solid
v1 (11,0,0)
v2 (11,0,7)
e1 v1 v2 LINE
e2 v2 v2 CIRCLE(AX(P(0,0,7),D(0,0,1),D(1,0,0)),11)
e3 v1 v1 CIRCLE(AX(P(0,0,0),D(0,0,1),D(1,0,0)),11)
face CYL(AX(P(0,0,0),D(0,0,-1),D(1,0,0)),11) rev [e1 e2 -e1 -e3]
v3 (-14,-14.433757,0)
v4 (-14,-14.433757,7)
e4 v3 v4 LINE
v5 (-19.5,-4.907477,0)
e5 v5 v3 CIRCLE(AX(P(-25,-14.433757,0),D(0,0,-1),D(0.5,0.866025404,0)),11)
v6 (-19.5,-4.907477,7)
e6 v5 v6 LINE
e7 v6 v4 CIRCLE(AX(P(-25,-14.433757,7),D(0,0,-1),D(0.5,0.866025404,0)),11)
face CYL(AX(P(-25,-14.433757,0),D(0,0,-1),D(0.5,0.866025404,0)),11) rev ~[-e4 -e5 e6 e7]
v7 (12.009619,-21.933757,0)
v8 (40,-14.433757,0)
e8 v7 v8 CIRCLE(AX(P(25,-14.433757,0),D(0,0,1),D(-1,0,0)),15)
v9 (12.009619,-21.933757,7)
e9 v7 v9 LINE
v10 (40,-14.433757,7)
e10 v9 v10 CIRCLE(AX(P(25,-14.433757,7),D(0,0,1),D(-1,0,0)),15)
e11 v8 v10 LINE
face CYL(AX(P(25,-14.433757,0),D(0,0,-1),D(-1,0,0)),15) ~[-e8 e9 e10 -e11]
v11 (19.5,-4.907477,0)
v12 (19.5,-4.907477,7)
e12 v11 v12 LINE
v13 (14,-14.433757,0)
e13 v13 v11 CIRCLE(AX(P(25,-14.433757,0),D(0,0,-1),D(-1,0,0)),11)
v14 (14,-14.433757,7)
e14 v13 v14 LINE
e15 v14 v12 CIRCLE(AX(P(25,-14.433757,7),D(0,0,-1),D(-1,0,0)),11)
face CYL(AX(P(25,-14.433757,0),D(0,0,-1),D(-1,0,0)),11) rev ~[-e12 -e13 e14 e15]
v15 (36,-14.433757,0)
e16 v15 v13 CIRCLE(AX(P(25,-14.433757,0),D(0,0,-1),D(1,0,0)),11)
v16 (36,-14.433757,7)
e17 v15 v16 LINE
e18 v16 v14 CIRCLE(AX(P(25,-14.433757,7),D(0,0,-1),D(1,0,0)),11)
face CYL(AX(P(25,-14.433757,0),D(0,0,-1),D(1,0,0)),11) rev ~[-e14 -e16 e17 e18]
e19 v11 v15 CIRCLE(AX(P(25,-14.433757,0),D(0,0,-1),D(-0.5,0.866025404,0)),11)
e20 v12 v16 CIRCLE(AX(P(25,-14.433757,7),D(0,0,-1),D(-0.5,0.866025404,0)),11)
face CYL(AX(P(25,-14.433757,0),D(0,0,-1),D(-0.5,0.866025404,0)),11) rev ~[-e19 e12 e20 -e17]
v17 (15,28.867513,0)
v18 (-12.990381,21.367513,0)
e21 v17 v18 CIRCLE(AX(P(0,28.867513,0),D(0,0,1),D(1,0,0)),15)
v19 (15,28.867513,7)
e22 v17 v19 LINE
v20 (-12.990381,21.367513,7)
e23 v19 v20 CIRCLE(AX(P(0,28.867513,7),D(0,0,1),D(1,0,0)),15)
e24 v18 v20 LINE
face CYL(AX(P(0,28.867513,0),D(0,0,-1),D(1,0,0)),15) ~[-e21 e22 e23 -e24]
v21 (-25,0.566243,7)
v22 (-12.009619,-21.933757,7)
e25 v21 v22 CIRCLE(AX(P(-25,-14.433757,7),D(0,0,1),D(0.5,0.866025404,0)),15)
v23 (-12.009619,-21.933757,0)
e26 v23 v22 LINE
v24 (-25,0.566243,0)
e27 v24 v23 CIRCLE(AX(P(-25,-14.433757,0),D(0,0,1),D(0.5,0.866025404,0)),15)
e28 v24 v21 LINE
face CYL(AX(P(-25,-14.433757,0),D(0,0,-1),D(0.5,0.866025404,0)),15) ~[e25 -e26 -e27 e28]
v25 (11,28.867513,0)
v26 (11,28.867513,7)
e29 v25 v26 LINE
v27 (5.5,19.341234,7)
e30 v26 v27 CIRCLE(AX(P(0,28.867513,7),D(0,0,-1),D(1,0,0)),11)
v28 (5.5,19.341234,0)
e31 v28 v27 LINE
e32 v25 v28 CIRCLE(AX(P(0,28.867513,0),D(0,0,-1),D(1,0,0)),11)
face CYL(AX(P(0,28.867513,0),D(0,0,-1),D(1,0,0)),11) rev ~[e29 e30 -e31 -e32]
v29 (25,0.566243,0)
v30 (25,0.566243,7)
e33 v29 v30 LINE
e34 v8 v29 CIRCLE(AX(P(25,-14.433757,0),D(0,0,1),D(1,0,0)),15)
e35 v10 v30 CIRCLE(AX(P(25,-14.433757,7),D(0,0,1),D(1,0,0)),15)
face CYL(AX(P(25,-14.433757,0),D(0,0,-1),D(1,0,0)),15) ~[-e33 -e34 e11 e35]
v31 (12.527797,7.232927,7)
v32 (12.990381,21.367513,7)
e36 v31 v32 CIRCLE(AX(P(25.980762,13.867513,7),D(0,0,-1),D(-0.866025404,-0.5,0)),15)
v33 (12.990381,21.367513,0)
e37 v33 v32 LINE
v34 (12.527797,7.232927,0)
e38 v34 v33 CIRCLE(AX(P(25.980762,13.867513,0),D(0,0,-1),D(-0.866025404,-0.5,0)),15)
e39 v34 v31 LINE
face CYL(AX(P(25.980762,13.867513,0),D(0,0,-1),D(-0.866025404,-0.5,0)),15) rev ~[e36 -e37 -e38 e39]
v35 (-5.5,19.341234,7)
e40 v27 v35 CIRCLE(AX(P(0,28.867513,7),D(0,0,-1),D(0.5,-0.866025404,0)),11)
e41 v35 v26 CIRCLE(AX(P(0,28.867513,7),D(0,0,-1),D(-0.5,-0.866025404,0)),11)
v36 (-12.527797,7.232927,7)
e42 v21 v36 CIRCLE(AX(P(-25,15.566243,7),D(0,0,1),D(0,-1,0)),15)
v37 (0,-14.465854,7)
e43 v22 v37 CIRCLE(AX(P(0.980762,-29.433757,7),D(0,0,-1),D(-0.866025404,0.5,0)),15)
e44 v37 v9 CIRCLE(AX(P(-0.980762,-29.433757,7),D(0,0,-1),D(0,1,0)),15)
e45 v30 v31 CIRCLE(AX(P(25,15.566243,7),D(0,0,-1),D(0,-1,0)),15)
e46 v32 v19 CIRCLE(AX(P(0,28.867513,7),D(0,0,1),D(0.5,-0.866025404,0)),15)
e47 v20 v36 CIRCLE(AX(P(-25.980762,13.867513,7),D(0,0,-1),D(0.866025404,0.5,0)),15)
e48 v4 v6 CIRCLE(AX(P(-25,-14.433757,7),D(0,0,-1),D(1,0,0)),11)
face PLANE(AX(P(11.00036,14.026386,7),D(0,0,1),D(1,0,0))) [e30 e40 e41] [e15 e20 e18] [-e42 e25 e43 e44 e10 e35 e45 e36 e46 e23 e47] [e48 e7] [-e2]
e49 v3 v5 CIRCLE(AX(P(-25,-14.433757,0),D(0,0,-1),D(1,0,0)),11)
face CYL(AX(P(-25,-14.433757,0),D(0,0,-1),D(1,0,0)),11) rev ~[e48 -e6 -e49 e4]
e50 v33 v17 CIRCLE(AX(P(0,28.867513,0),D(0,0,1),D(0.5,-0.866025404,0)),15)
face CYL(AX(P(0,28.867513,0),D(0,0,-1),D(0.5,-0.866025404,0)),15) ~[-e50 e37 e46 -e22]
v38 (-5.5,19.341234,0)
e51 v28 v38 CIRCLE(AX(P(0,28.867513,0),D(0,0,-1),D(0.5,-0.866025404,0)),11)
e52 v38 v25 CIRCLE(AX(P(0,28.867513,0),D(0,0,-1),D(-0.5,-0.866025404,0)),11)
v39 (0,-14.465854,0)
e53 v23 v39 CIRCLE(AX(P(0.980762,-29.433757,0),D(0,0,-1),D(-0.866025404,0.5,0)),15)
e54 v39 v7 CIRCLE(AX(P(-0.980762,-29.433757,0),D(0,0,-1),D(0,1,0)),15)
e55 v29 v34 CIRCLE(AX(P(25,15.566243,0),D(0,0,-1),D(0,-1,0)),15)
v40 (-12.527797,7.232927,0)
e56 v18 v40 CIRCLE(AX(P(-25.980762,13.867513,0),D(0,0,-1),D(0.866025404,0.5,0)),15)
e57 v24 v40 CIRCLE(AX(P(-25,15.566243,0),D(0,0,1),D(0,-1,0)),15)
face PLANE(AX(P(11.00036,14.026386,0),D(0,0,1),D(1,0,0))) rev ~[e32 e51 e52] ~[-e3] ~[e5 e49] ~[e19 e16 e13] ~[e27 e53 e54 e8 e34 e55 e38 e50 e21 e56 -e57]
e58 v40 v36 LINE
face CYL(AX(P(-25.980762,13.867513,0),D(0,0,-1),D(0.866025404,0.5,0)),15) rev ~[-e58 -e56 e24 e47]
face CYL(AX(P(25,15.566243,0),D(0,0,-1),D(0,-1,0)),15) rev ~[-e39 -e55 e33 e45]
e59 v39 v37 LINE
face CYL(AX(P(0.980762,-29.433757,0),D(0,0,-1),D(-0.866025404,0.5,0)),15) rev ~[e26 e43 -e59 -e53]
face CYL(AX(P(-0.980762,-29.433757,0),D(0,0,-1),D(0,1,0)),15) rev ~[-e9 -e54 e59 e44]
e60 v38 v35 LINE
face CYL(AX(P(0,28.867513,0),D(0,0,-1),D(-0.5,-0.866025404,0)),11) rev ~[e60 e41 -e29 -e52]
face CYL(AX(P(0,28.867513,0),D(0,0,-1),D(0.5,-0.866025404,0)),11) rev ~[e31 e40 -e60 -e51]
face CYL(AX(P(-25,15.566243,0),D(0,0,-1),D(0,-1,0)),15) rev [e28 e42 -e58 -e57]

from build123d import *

# Parameters (mm, degrees)
F0_R        = 11
F1_DEPTH    = 7
F2_T1_DEPTH = 7


# Not quite as in the source:
# - a fillet or chamfer that OpenCascade refuses, or shapes differently, is made with other operations: its cross-section is extruded or revolved along the edge and cut away or added


with BuildPart() as f1:
    # F0 (on Top) → F1 (new body)
    with BuildSketch(Plane.XY):
        with BuildLine():
            ThreePointArc((-17.5, -1.443375673), (-37.9903810568, -21.9337567297), (-10, -14.4337567297))
            Line((-10, -14.4337567297), (-14, -14.4337567297))
            ThreePointArc((-14, -14.4337567297), (-34.5262794416, -19.9337567297), (-19.5, -4.9074772881))
            Line((-19.5, -4.9074772881), (-17.5, -1.443375673))
        make_face()
        with BuildLine():
            ThreePointArc((-17.5, -1.443375673), (-12.0096189432, -6.9337567297), (-10, -14.4337567297))
            Line((-10, -14.4337567297), (10, -14.4337567297))
            ThreePointArc((10, -14.4337567297), (12.0096189432, -6.9337567297), (17.5, -1.443375673))
            Line((17.5, -1.443375673), (7.5, 15.8771324027))
            ThreePointArc((7.5, 15.8771324027), (0, 13.8675134595), (-7.5, 15.8771324027))
            Line((-7.5, 15.8771324027), (-17.5, -1.443375673))
        make_face()
        Circle(F0_R, mode=Mode.SUBTRACT)
        with BuildLine():
            Line((-14, -14.4337567297), (-10, -14.4337567297))
            ThreePointArc((-10, -14.4337567297), (-12.0096189432, -6.9337567297), (-17.5, -1.443375673))
            Line((-17.5, -1.443375673), (-19.5, -4.9074772881))
            ThreePointArc((-19.5, -4.9074772881), (-15.4737205584, -8.9337567297), (-14, -14.4337567297))
        make_face()
        with BuildLine():
            ThreePointArc((17.5, -1.443375673), (12.0096189432, -6.9337567297), (10, -14.4337567297))
            Line((10, -14.4337567297), (14, -14.4337567297))
            ThreePointArc((14, -14.4337567297), (15.4737205584, -8.9337567297), (19.5, -4.9074772881))
            Line((19.5, -4.9074772881), (17.5, -1.443375673))
        make_face()
        with BuildLine():
            Line((14, -14.4337567297), (10, -14.4337567297))
            ThreePointArc((10, -14.4337567297), (25, -29.4337567297), (40, -14.4337567297))
            ThreePointArc((40, -14.4337567297), (32.5, -1.443375673), (17.5, -1.443375673))
            Line((17.5, -1.443375673), (19.5, -4.9074772881))
            ThreePointArc((19.5, -4.9074772881), (30.5, -4.9074772881), (36, -14.4337567297))
            ThreePointArc((36, -14.4337567297), (25, -25.4337567297), (14, -14.4337567297))
        make_face()
        with BuildLine():
            ThreePointArc((15, 28.8675134595), (-7.5, 41.8578945162), (-7.5, 15.8771324027))
            Line((-7.5, 15.8771324027), (-5.5, 19.3412340179))
            ThreePointArc((-5.5, 19.3412340179), (-5.5, 38.3937929011), (11, 28.8675134595))
            ThreePointArc((11, 28.8675134595), (9.5262794416, 23.3675134595), (5.5, 19.3412340179))
            Line((5.5, 19.3412340179), (7.5, 15.8771324027))
            ThreePointArc((7.5, 15.8771324027), (12.9903810568, 21.3675134595), (15, 28.8675134595))
        make_face()
        with BuildLine():
            Line((-5.5, 19.3412340179), (-7.5, 15.8771324027))
            ThreePointArc((-7.5, 15.8771324027), (0, 13.8675134595), (7.5, 15.8771324027))
            Line((7.5, 15.8771324027), (5.5, 19.3412340179))
            ThreePointArc((5.5, 19.3412340179), (0, 17.8675134595), (-5.5, 19.3412340179))
        make_face()
    extrude(amount=F1_DEPTH)

    # F2: fillet of radius 15 on 6 edges, made by hand

    # F2_s2 → F2_t1 (join)
    with BuildSketch(Plane.XY):
        with BuildLine():
            ThreePointArc((12.9903810568, 6.3675134595), (10.9807621135, 13.8675134595), (12.9903810568, 21.3675134595))
            ThreePointArc((12.9903810568, 21.3675134595), (10.6066017178, 18.2609117417), (7.5, 15.8771324027))
            Line((7.5, 15.8771324027), (12.9903810568, 6.3675134595))
        make_face()
        with BuildLine():
            ThreePointArc((25, 0.5662432703), (17.5, 2.5758622135), (12.0096189432, 8.0662432703))
            Line((12.0096189432, 8.0662432703), (17.5, -1.443375673))
            ThreePointArc((17.5, -1.443375673), (21.1177143235, 0.0551306646), (25, 0.5662432703))
        make_face()
        with BuildLine():
            ThreePointArc((-12.9903810568, 21.3675134595), (-10.9807621135, 13.8675134595), (-12.9903810568, 6.3675134595))
            Line((-12.9903810568, 6.3675134595), (-7.5, 15.8771324027))
            ThreePointArc((-7.5, 15.8771324027), (-10.6066017178, 18.2609117417), (-12.9903810568, 21.3675134595))
        make_face()
        with BuildLine():
            ThreePointArc((-25, 0.5662432703), (-17.5, 2.5758622135), (-12.0096189432, 8.0662432703))
            Line((-12.0096189432, 8.0662432703), (-17.5, -1.443375673))
            ThreePointArc((-17.5, -1.443375673), (-21.1177143235, 0.0551306646), (-25, 0.5662432703))
        make_face()
        with BuildLine():
            ThreePointArc((-12.0096189432, -21.9337567297), (-6.5192378865, -16.443375673), (0.9807621135, -14.4337567297))
            Line((0.9807621135, -14.4337567297), (-10, -14.4337567297))
            ThreePointArc((-10, -14.4337567297), (-10.5111126057, -18.3160424063), (-12.0096189432, -21.9337567297))
        make_face()
        with BuildLine():
            ThreePointArc((-0.9807621135, -14.4337567297), (6.5192378865, -16.443375673), (12.0096189432, -21.9337567297))
            ThreePointArc((12.0096189432, -21.9337567297), (10.5111126057, -18.3160424063), (10, -14.4337567297))
            Line((10, -14.4337567297), (-0.9807621135, -14.4337567297))
        make_face()
    extrude(amount=F2_T1_DEPTH)


solid = f1.part
